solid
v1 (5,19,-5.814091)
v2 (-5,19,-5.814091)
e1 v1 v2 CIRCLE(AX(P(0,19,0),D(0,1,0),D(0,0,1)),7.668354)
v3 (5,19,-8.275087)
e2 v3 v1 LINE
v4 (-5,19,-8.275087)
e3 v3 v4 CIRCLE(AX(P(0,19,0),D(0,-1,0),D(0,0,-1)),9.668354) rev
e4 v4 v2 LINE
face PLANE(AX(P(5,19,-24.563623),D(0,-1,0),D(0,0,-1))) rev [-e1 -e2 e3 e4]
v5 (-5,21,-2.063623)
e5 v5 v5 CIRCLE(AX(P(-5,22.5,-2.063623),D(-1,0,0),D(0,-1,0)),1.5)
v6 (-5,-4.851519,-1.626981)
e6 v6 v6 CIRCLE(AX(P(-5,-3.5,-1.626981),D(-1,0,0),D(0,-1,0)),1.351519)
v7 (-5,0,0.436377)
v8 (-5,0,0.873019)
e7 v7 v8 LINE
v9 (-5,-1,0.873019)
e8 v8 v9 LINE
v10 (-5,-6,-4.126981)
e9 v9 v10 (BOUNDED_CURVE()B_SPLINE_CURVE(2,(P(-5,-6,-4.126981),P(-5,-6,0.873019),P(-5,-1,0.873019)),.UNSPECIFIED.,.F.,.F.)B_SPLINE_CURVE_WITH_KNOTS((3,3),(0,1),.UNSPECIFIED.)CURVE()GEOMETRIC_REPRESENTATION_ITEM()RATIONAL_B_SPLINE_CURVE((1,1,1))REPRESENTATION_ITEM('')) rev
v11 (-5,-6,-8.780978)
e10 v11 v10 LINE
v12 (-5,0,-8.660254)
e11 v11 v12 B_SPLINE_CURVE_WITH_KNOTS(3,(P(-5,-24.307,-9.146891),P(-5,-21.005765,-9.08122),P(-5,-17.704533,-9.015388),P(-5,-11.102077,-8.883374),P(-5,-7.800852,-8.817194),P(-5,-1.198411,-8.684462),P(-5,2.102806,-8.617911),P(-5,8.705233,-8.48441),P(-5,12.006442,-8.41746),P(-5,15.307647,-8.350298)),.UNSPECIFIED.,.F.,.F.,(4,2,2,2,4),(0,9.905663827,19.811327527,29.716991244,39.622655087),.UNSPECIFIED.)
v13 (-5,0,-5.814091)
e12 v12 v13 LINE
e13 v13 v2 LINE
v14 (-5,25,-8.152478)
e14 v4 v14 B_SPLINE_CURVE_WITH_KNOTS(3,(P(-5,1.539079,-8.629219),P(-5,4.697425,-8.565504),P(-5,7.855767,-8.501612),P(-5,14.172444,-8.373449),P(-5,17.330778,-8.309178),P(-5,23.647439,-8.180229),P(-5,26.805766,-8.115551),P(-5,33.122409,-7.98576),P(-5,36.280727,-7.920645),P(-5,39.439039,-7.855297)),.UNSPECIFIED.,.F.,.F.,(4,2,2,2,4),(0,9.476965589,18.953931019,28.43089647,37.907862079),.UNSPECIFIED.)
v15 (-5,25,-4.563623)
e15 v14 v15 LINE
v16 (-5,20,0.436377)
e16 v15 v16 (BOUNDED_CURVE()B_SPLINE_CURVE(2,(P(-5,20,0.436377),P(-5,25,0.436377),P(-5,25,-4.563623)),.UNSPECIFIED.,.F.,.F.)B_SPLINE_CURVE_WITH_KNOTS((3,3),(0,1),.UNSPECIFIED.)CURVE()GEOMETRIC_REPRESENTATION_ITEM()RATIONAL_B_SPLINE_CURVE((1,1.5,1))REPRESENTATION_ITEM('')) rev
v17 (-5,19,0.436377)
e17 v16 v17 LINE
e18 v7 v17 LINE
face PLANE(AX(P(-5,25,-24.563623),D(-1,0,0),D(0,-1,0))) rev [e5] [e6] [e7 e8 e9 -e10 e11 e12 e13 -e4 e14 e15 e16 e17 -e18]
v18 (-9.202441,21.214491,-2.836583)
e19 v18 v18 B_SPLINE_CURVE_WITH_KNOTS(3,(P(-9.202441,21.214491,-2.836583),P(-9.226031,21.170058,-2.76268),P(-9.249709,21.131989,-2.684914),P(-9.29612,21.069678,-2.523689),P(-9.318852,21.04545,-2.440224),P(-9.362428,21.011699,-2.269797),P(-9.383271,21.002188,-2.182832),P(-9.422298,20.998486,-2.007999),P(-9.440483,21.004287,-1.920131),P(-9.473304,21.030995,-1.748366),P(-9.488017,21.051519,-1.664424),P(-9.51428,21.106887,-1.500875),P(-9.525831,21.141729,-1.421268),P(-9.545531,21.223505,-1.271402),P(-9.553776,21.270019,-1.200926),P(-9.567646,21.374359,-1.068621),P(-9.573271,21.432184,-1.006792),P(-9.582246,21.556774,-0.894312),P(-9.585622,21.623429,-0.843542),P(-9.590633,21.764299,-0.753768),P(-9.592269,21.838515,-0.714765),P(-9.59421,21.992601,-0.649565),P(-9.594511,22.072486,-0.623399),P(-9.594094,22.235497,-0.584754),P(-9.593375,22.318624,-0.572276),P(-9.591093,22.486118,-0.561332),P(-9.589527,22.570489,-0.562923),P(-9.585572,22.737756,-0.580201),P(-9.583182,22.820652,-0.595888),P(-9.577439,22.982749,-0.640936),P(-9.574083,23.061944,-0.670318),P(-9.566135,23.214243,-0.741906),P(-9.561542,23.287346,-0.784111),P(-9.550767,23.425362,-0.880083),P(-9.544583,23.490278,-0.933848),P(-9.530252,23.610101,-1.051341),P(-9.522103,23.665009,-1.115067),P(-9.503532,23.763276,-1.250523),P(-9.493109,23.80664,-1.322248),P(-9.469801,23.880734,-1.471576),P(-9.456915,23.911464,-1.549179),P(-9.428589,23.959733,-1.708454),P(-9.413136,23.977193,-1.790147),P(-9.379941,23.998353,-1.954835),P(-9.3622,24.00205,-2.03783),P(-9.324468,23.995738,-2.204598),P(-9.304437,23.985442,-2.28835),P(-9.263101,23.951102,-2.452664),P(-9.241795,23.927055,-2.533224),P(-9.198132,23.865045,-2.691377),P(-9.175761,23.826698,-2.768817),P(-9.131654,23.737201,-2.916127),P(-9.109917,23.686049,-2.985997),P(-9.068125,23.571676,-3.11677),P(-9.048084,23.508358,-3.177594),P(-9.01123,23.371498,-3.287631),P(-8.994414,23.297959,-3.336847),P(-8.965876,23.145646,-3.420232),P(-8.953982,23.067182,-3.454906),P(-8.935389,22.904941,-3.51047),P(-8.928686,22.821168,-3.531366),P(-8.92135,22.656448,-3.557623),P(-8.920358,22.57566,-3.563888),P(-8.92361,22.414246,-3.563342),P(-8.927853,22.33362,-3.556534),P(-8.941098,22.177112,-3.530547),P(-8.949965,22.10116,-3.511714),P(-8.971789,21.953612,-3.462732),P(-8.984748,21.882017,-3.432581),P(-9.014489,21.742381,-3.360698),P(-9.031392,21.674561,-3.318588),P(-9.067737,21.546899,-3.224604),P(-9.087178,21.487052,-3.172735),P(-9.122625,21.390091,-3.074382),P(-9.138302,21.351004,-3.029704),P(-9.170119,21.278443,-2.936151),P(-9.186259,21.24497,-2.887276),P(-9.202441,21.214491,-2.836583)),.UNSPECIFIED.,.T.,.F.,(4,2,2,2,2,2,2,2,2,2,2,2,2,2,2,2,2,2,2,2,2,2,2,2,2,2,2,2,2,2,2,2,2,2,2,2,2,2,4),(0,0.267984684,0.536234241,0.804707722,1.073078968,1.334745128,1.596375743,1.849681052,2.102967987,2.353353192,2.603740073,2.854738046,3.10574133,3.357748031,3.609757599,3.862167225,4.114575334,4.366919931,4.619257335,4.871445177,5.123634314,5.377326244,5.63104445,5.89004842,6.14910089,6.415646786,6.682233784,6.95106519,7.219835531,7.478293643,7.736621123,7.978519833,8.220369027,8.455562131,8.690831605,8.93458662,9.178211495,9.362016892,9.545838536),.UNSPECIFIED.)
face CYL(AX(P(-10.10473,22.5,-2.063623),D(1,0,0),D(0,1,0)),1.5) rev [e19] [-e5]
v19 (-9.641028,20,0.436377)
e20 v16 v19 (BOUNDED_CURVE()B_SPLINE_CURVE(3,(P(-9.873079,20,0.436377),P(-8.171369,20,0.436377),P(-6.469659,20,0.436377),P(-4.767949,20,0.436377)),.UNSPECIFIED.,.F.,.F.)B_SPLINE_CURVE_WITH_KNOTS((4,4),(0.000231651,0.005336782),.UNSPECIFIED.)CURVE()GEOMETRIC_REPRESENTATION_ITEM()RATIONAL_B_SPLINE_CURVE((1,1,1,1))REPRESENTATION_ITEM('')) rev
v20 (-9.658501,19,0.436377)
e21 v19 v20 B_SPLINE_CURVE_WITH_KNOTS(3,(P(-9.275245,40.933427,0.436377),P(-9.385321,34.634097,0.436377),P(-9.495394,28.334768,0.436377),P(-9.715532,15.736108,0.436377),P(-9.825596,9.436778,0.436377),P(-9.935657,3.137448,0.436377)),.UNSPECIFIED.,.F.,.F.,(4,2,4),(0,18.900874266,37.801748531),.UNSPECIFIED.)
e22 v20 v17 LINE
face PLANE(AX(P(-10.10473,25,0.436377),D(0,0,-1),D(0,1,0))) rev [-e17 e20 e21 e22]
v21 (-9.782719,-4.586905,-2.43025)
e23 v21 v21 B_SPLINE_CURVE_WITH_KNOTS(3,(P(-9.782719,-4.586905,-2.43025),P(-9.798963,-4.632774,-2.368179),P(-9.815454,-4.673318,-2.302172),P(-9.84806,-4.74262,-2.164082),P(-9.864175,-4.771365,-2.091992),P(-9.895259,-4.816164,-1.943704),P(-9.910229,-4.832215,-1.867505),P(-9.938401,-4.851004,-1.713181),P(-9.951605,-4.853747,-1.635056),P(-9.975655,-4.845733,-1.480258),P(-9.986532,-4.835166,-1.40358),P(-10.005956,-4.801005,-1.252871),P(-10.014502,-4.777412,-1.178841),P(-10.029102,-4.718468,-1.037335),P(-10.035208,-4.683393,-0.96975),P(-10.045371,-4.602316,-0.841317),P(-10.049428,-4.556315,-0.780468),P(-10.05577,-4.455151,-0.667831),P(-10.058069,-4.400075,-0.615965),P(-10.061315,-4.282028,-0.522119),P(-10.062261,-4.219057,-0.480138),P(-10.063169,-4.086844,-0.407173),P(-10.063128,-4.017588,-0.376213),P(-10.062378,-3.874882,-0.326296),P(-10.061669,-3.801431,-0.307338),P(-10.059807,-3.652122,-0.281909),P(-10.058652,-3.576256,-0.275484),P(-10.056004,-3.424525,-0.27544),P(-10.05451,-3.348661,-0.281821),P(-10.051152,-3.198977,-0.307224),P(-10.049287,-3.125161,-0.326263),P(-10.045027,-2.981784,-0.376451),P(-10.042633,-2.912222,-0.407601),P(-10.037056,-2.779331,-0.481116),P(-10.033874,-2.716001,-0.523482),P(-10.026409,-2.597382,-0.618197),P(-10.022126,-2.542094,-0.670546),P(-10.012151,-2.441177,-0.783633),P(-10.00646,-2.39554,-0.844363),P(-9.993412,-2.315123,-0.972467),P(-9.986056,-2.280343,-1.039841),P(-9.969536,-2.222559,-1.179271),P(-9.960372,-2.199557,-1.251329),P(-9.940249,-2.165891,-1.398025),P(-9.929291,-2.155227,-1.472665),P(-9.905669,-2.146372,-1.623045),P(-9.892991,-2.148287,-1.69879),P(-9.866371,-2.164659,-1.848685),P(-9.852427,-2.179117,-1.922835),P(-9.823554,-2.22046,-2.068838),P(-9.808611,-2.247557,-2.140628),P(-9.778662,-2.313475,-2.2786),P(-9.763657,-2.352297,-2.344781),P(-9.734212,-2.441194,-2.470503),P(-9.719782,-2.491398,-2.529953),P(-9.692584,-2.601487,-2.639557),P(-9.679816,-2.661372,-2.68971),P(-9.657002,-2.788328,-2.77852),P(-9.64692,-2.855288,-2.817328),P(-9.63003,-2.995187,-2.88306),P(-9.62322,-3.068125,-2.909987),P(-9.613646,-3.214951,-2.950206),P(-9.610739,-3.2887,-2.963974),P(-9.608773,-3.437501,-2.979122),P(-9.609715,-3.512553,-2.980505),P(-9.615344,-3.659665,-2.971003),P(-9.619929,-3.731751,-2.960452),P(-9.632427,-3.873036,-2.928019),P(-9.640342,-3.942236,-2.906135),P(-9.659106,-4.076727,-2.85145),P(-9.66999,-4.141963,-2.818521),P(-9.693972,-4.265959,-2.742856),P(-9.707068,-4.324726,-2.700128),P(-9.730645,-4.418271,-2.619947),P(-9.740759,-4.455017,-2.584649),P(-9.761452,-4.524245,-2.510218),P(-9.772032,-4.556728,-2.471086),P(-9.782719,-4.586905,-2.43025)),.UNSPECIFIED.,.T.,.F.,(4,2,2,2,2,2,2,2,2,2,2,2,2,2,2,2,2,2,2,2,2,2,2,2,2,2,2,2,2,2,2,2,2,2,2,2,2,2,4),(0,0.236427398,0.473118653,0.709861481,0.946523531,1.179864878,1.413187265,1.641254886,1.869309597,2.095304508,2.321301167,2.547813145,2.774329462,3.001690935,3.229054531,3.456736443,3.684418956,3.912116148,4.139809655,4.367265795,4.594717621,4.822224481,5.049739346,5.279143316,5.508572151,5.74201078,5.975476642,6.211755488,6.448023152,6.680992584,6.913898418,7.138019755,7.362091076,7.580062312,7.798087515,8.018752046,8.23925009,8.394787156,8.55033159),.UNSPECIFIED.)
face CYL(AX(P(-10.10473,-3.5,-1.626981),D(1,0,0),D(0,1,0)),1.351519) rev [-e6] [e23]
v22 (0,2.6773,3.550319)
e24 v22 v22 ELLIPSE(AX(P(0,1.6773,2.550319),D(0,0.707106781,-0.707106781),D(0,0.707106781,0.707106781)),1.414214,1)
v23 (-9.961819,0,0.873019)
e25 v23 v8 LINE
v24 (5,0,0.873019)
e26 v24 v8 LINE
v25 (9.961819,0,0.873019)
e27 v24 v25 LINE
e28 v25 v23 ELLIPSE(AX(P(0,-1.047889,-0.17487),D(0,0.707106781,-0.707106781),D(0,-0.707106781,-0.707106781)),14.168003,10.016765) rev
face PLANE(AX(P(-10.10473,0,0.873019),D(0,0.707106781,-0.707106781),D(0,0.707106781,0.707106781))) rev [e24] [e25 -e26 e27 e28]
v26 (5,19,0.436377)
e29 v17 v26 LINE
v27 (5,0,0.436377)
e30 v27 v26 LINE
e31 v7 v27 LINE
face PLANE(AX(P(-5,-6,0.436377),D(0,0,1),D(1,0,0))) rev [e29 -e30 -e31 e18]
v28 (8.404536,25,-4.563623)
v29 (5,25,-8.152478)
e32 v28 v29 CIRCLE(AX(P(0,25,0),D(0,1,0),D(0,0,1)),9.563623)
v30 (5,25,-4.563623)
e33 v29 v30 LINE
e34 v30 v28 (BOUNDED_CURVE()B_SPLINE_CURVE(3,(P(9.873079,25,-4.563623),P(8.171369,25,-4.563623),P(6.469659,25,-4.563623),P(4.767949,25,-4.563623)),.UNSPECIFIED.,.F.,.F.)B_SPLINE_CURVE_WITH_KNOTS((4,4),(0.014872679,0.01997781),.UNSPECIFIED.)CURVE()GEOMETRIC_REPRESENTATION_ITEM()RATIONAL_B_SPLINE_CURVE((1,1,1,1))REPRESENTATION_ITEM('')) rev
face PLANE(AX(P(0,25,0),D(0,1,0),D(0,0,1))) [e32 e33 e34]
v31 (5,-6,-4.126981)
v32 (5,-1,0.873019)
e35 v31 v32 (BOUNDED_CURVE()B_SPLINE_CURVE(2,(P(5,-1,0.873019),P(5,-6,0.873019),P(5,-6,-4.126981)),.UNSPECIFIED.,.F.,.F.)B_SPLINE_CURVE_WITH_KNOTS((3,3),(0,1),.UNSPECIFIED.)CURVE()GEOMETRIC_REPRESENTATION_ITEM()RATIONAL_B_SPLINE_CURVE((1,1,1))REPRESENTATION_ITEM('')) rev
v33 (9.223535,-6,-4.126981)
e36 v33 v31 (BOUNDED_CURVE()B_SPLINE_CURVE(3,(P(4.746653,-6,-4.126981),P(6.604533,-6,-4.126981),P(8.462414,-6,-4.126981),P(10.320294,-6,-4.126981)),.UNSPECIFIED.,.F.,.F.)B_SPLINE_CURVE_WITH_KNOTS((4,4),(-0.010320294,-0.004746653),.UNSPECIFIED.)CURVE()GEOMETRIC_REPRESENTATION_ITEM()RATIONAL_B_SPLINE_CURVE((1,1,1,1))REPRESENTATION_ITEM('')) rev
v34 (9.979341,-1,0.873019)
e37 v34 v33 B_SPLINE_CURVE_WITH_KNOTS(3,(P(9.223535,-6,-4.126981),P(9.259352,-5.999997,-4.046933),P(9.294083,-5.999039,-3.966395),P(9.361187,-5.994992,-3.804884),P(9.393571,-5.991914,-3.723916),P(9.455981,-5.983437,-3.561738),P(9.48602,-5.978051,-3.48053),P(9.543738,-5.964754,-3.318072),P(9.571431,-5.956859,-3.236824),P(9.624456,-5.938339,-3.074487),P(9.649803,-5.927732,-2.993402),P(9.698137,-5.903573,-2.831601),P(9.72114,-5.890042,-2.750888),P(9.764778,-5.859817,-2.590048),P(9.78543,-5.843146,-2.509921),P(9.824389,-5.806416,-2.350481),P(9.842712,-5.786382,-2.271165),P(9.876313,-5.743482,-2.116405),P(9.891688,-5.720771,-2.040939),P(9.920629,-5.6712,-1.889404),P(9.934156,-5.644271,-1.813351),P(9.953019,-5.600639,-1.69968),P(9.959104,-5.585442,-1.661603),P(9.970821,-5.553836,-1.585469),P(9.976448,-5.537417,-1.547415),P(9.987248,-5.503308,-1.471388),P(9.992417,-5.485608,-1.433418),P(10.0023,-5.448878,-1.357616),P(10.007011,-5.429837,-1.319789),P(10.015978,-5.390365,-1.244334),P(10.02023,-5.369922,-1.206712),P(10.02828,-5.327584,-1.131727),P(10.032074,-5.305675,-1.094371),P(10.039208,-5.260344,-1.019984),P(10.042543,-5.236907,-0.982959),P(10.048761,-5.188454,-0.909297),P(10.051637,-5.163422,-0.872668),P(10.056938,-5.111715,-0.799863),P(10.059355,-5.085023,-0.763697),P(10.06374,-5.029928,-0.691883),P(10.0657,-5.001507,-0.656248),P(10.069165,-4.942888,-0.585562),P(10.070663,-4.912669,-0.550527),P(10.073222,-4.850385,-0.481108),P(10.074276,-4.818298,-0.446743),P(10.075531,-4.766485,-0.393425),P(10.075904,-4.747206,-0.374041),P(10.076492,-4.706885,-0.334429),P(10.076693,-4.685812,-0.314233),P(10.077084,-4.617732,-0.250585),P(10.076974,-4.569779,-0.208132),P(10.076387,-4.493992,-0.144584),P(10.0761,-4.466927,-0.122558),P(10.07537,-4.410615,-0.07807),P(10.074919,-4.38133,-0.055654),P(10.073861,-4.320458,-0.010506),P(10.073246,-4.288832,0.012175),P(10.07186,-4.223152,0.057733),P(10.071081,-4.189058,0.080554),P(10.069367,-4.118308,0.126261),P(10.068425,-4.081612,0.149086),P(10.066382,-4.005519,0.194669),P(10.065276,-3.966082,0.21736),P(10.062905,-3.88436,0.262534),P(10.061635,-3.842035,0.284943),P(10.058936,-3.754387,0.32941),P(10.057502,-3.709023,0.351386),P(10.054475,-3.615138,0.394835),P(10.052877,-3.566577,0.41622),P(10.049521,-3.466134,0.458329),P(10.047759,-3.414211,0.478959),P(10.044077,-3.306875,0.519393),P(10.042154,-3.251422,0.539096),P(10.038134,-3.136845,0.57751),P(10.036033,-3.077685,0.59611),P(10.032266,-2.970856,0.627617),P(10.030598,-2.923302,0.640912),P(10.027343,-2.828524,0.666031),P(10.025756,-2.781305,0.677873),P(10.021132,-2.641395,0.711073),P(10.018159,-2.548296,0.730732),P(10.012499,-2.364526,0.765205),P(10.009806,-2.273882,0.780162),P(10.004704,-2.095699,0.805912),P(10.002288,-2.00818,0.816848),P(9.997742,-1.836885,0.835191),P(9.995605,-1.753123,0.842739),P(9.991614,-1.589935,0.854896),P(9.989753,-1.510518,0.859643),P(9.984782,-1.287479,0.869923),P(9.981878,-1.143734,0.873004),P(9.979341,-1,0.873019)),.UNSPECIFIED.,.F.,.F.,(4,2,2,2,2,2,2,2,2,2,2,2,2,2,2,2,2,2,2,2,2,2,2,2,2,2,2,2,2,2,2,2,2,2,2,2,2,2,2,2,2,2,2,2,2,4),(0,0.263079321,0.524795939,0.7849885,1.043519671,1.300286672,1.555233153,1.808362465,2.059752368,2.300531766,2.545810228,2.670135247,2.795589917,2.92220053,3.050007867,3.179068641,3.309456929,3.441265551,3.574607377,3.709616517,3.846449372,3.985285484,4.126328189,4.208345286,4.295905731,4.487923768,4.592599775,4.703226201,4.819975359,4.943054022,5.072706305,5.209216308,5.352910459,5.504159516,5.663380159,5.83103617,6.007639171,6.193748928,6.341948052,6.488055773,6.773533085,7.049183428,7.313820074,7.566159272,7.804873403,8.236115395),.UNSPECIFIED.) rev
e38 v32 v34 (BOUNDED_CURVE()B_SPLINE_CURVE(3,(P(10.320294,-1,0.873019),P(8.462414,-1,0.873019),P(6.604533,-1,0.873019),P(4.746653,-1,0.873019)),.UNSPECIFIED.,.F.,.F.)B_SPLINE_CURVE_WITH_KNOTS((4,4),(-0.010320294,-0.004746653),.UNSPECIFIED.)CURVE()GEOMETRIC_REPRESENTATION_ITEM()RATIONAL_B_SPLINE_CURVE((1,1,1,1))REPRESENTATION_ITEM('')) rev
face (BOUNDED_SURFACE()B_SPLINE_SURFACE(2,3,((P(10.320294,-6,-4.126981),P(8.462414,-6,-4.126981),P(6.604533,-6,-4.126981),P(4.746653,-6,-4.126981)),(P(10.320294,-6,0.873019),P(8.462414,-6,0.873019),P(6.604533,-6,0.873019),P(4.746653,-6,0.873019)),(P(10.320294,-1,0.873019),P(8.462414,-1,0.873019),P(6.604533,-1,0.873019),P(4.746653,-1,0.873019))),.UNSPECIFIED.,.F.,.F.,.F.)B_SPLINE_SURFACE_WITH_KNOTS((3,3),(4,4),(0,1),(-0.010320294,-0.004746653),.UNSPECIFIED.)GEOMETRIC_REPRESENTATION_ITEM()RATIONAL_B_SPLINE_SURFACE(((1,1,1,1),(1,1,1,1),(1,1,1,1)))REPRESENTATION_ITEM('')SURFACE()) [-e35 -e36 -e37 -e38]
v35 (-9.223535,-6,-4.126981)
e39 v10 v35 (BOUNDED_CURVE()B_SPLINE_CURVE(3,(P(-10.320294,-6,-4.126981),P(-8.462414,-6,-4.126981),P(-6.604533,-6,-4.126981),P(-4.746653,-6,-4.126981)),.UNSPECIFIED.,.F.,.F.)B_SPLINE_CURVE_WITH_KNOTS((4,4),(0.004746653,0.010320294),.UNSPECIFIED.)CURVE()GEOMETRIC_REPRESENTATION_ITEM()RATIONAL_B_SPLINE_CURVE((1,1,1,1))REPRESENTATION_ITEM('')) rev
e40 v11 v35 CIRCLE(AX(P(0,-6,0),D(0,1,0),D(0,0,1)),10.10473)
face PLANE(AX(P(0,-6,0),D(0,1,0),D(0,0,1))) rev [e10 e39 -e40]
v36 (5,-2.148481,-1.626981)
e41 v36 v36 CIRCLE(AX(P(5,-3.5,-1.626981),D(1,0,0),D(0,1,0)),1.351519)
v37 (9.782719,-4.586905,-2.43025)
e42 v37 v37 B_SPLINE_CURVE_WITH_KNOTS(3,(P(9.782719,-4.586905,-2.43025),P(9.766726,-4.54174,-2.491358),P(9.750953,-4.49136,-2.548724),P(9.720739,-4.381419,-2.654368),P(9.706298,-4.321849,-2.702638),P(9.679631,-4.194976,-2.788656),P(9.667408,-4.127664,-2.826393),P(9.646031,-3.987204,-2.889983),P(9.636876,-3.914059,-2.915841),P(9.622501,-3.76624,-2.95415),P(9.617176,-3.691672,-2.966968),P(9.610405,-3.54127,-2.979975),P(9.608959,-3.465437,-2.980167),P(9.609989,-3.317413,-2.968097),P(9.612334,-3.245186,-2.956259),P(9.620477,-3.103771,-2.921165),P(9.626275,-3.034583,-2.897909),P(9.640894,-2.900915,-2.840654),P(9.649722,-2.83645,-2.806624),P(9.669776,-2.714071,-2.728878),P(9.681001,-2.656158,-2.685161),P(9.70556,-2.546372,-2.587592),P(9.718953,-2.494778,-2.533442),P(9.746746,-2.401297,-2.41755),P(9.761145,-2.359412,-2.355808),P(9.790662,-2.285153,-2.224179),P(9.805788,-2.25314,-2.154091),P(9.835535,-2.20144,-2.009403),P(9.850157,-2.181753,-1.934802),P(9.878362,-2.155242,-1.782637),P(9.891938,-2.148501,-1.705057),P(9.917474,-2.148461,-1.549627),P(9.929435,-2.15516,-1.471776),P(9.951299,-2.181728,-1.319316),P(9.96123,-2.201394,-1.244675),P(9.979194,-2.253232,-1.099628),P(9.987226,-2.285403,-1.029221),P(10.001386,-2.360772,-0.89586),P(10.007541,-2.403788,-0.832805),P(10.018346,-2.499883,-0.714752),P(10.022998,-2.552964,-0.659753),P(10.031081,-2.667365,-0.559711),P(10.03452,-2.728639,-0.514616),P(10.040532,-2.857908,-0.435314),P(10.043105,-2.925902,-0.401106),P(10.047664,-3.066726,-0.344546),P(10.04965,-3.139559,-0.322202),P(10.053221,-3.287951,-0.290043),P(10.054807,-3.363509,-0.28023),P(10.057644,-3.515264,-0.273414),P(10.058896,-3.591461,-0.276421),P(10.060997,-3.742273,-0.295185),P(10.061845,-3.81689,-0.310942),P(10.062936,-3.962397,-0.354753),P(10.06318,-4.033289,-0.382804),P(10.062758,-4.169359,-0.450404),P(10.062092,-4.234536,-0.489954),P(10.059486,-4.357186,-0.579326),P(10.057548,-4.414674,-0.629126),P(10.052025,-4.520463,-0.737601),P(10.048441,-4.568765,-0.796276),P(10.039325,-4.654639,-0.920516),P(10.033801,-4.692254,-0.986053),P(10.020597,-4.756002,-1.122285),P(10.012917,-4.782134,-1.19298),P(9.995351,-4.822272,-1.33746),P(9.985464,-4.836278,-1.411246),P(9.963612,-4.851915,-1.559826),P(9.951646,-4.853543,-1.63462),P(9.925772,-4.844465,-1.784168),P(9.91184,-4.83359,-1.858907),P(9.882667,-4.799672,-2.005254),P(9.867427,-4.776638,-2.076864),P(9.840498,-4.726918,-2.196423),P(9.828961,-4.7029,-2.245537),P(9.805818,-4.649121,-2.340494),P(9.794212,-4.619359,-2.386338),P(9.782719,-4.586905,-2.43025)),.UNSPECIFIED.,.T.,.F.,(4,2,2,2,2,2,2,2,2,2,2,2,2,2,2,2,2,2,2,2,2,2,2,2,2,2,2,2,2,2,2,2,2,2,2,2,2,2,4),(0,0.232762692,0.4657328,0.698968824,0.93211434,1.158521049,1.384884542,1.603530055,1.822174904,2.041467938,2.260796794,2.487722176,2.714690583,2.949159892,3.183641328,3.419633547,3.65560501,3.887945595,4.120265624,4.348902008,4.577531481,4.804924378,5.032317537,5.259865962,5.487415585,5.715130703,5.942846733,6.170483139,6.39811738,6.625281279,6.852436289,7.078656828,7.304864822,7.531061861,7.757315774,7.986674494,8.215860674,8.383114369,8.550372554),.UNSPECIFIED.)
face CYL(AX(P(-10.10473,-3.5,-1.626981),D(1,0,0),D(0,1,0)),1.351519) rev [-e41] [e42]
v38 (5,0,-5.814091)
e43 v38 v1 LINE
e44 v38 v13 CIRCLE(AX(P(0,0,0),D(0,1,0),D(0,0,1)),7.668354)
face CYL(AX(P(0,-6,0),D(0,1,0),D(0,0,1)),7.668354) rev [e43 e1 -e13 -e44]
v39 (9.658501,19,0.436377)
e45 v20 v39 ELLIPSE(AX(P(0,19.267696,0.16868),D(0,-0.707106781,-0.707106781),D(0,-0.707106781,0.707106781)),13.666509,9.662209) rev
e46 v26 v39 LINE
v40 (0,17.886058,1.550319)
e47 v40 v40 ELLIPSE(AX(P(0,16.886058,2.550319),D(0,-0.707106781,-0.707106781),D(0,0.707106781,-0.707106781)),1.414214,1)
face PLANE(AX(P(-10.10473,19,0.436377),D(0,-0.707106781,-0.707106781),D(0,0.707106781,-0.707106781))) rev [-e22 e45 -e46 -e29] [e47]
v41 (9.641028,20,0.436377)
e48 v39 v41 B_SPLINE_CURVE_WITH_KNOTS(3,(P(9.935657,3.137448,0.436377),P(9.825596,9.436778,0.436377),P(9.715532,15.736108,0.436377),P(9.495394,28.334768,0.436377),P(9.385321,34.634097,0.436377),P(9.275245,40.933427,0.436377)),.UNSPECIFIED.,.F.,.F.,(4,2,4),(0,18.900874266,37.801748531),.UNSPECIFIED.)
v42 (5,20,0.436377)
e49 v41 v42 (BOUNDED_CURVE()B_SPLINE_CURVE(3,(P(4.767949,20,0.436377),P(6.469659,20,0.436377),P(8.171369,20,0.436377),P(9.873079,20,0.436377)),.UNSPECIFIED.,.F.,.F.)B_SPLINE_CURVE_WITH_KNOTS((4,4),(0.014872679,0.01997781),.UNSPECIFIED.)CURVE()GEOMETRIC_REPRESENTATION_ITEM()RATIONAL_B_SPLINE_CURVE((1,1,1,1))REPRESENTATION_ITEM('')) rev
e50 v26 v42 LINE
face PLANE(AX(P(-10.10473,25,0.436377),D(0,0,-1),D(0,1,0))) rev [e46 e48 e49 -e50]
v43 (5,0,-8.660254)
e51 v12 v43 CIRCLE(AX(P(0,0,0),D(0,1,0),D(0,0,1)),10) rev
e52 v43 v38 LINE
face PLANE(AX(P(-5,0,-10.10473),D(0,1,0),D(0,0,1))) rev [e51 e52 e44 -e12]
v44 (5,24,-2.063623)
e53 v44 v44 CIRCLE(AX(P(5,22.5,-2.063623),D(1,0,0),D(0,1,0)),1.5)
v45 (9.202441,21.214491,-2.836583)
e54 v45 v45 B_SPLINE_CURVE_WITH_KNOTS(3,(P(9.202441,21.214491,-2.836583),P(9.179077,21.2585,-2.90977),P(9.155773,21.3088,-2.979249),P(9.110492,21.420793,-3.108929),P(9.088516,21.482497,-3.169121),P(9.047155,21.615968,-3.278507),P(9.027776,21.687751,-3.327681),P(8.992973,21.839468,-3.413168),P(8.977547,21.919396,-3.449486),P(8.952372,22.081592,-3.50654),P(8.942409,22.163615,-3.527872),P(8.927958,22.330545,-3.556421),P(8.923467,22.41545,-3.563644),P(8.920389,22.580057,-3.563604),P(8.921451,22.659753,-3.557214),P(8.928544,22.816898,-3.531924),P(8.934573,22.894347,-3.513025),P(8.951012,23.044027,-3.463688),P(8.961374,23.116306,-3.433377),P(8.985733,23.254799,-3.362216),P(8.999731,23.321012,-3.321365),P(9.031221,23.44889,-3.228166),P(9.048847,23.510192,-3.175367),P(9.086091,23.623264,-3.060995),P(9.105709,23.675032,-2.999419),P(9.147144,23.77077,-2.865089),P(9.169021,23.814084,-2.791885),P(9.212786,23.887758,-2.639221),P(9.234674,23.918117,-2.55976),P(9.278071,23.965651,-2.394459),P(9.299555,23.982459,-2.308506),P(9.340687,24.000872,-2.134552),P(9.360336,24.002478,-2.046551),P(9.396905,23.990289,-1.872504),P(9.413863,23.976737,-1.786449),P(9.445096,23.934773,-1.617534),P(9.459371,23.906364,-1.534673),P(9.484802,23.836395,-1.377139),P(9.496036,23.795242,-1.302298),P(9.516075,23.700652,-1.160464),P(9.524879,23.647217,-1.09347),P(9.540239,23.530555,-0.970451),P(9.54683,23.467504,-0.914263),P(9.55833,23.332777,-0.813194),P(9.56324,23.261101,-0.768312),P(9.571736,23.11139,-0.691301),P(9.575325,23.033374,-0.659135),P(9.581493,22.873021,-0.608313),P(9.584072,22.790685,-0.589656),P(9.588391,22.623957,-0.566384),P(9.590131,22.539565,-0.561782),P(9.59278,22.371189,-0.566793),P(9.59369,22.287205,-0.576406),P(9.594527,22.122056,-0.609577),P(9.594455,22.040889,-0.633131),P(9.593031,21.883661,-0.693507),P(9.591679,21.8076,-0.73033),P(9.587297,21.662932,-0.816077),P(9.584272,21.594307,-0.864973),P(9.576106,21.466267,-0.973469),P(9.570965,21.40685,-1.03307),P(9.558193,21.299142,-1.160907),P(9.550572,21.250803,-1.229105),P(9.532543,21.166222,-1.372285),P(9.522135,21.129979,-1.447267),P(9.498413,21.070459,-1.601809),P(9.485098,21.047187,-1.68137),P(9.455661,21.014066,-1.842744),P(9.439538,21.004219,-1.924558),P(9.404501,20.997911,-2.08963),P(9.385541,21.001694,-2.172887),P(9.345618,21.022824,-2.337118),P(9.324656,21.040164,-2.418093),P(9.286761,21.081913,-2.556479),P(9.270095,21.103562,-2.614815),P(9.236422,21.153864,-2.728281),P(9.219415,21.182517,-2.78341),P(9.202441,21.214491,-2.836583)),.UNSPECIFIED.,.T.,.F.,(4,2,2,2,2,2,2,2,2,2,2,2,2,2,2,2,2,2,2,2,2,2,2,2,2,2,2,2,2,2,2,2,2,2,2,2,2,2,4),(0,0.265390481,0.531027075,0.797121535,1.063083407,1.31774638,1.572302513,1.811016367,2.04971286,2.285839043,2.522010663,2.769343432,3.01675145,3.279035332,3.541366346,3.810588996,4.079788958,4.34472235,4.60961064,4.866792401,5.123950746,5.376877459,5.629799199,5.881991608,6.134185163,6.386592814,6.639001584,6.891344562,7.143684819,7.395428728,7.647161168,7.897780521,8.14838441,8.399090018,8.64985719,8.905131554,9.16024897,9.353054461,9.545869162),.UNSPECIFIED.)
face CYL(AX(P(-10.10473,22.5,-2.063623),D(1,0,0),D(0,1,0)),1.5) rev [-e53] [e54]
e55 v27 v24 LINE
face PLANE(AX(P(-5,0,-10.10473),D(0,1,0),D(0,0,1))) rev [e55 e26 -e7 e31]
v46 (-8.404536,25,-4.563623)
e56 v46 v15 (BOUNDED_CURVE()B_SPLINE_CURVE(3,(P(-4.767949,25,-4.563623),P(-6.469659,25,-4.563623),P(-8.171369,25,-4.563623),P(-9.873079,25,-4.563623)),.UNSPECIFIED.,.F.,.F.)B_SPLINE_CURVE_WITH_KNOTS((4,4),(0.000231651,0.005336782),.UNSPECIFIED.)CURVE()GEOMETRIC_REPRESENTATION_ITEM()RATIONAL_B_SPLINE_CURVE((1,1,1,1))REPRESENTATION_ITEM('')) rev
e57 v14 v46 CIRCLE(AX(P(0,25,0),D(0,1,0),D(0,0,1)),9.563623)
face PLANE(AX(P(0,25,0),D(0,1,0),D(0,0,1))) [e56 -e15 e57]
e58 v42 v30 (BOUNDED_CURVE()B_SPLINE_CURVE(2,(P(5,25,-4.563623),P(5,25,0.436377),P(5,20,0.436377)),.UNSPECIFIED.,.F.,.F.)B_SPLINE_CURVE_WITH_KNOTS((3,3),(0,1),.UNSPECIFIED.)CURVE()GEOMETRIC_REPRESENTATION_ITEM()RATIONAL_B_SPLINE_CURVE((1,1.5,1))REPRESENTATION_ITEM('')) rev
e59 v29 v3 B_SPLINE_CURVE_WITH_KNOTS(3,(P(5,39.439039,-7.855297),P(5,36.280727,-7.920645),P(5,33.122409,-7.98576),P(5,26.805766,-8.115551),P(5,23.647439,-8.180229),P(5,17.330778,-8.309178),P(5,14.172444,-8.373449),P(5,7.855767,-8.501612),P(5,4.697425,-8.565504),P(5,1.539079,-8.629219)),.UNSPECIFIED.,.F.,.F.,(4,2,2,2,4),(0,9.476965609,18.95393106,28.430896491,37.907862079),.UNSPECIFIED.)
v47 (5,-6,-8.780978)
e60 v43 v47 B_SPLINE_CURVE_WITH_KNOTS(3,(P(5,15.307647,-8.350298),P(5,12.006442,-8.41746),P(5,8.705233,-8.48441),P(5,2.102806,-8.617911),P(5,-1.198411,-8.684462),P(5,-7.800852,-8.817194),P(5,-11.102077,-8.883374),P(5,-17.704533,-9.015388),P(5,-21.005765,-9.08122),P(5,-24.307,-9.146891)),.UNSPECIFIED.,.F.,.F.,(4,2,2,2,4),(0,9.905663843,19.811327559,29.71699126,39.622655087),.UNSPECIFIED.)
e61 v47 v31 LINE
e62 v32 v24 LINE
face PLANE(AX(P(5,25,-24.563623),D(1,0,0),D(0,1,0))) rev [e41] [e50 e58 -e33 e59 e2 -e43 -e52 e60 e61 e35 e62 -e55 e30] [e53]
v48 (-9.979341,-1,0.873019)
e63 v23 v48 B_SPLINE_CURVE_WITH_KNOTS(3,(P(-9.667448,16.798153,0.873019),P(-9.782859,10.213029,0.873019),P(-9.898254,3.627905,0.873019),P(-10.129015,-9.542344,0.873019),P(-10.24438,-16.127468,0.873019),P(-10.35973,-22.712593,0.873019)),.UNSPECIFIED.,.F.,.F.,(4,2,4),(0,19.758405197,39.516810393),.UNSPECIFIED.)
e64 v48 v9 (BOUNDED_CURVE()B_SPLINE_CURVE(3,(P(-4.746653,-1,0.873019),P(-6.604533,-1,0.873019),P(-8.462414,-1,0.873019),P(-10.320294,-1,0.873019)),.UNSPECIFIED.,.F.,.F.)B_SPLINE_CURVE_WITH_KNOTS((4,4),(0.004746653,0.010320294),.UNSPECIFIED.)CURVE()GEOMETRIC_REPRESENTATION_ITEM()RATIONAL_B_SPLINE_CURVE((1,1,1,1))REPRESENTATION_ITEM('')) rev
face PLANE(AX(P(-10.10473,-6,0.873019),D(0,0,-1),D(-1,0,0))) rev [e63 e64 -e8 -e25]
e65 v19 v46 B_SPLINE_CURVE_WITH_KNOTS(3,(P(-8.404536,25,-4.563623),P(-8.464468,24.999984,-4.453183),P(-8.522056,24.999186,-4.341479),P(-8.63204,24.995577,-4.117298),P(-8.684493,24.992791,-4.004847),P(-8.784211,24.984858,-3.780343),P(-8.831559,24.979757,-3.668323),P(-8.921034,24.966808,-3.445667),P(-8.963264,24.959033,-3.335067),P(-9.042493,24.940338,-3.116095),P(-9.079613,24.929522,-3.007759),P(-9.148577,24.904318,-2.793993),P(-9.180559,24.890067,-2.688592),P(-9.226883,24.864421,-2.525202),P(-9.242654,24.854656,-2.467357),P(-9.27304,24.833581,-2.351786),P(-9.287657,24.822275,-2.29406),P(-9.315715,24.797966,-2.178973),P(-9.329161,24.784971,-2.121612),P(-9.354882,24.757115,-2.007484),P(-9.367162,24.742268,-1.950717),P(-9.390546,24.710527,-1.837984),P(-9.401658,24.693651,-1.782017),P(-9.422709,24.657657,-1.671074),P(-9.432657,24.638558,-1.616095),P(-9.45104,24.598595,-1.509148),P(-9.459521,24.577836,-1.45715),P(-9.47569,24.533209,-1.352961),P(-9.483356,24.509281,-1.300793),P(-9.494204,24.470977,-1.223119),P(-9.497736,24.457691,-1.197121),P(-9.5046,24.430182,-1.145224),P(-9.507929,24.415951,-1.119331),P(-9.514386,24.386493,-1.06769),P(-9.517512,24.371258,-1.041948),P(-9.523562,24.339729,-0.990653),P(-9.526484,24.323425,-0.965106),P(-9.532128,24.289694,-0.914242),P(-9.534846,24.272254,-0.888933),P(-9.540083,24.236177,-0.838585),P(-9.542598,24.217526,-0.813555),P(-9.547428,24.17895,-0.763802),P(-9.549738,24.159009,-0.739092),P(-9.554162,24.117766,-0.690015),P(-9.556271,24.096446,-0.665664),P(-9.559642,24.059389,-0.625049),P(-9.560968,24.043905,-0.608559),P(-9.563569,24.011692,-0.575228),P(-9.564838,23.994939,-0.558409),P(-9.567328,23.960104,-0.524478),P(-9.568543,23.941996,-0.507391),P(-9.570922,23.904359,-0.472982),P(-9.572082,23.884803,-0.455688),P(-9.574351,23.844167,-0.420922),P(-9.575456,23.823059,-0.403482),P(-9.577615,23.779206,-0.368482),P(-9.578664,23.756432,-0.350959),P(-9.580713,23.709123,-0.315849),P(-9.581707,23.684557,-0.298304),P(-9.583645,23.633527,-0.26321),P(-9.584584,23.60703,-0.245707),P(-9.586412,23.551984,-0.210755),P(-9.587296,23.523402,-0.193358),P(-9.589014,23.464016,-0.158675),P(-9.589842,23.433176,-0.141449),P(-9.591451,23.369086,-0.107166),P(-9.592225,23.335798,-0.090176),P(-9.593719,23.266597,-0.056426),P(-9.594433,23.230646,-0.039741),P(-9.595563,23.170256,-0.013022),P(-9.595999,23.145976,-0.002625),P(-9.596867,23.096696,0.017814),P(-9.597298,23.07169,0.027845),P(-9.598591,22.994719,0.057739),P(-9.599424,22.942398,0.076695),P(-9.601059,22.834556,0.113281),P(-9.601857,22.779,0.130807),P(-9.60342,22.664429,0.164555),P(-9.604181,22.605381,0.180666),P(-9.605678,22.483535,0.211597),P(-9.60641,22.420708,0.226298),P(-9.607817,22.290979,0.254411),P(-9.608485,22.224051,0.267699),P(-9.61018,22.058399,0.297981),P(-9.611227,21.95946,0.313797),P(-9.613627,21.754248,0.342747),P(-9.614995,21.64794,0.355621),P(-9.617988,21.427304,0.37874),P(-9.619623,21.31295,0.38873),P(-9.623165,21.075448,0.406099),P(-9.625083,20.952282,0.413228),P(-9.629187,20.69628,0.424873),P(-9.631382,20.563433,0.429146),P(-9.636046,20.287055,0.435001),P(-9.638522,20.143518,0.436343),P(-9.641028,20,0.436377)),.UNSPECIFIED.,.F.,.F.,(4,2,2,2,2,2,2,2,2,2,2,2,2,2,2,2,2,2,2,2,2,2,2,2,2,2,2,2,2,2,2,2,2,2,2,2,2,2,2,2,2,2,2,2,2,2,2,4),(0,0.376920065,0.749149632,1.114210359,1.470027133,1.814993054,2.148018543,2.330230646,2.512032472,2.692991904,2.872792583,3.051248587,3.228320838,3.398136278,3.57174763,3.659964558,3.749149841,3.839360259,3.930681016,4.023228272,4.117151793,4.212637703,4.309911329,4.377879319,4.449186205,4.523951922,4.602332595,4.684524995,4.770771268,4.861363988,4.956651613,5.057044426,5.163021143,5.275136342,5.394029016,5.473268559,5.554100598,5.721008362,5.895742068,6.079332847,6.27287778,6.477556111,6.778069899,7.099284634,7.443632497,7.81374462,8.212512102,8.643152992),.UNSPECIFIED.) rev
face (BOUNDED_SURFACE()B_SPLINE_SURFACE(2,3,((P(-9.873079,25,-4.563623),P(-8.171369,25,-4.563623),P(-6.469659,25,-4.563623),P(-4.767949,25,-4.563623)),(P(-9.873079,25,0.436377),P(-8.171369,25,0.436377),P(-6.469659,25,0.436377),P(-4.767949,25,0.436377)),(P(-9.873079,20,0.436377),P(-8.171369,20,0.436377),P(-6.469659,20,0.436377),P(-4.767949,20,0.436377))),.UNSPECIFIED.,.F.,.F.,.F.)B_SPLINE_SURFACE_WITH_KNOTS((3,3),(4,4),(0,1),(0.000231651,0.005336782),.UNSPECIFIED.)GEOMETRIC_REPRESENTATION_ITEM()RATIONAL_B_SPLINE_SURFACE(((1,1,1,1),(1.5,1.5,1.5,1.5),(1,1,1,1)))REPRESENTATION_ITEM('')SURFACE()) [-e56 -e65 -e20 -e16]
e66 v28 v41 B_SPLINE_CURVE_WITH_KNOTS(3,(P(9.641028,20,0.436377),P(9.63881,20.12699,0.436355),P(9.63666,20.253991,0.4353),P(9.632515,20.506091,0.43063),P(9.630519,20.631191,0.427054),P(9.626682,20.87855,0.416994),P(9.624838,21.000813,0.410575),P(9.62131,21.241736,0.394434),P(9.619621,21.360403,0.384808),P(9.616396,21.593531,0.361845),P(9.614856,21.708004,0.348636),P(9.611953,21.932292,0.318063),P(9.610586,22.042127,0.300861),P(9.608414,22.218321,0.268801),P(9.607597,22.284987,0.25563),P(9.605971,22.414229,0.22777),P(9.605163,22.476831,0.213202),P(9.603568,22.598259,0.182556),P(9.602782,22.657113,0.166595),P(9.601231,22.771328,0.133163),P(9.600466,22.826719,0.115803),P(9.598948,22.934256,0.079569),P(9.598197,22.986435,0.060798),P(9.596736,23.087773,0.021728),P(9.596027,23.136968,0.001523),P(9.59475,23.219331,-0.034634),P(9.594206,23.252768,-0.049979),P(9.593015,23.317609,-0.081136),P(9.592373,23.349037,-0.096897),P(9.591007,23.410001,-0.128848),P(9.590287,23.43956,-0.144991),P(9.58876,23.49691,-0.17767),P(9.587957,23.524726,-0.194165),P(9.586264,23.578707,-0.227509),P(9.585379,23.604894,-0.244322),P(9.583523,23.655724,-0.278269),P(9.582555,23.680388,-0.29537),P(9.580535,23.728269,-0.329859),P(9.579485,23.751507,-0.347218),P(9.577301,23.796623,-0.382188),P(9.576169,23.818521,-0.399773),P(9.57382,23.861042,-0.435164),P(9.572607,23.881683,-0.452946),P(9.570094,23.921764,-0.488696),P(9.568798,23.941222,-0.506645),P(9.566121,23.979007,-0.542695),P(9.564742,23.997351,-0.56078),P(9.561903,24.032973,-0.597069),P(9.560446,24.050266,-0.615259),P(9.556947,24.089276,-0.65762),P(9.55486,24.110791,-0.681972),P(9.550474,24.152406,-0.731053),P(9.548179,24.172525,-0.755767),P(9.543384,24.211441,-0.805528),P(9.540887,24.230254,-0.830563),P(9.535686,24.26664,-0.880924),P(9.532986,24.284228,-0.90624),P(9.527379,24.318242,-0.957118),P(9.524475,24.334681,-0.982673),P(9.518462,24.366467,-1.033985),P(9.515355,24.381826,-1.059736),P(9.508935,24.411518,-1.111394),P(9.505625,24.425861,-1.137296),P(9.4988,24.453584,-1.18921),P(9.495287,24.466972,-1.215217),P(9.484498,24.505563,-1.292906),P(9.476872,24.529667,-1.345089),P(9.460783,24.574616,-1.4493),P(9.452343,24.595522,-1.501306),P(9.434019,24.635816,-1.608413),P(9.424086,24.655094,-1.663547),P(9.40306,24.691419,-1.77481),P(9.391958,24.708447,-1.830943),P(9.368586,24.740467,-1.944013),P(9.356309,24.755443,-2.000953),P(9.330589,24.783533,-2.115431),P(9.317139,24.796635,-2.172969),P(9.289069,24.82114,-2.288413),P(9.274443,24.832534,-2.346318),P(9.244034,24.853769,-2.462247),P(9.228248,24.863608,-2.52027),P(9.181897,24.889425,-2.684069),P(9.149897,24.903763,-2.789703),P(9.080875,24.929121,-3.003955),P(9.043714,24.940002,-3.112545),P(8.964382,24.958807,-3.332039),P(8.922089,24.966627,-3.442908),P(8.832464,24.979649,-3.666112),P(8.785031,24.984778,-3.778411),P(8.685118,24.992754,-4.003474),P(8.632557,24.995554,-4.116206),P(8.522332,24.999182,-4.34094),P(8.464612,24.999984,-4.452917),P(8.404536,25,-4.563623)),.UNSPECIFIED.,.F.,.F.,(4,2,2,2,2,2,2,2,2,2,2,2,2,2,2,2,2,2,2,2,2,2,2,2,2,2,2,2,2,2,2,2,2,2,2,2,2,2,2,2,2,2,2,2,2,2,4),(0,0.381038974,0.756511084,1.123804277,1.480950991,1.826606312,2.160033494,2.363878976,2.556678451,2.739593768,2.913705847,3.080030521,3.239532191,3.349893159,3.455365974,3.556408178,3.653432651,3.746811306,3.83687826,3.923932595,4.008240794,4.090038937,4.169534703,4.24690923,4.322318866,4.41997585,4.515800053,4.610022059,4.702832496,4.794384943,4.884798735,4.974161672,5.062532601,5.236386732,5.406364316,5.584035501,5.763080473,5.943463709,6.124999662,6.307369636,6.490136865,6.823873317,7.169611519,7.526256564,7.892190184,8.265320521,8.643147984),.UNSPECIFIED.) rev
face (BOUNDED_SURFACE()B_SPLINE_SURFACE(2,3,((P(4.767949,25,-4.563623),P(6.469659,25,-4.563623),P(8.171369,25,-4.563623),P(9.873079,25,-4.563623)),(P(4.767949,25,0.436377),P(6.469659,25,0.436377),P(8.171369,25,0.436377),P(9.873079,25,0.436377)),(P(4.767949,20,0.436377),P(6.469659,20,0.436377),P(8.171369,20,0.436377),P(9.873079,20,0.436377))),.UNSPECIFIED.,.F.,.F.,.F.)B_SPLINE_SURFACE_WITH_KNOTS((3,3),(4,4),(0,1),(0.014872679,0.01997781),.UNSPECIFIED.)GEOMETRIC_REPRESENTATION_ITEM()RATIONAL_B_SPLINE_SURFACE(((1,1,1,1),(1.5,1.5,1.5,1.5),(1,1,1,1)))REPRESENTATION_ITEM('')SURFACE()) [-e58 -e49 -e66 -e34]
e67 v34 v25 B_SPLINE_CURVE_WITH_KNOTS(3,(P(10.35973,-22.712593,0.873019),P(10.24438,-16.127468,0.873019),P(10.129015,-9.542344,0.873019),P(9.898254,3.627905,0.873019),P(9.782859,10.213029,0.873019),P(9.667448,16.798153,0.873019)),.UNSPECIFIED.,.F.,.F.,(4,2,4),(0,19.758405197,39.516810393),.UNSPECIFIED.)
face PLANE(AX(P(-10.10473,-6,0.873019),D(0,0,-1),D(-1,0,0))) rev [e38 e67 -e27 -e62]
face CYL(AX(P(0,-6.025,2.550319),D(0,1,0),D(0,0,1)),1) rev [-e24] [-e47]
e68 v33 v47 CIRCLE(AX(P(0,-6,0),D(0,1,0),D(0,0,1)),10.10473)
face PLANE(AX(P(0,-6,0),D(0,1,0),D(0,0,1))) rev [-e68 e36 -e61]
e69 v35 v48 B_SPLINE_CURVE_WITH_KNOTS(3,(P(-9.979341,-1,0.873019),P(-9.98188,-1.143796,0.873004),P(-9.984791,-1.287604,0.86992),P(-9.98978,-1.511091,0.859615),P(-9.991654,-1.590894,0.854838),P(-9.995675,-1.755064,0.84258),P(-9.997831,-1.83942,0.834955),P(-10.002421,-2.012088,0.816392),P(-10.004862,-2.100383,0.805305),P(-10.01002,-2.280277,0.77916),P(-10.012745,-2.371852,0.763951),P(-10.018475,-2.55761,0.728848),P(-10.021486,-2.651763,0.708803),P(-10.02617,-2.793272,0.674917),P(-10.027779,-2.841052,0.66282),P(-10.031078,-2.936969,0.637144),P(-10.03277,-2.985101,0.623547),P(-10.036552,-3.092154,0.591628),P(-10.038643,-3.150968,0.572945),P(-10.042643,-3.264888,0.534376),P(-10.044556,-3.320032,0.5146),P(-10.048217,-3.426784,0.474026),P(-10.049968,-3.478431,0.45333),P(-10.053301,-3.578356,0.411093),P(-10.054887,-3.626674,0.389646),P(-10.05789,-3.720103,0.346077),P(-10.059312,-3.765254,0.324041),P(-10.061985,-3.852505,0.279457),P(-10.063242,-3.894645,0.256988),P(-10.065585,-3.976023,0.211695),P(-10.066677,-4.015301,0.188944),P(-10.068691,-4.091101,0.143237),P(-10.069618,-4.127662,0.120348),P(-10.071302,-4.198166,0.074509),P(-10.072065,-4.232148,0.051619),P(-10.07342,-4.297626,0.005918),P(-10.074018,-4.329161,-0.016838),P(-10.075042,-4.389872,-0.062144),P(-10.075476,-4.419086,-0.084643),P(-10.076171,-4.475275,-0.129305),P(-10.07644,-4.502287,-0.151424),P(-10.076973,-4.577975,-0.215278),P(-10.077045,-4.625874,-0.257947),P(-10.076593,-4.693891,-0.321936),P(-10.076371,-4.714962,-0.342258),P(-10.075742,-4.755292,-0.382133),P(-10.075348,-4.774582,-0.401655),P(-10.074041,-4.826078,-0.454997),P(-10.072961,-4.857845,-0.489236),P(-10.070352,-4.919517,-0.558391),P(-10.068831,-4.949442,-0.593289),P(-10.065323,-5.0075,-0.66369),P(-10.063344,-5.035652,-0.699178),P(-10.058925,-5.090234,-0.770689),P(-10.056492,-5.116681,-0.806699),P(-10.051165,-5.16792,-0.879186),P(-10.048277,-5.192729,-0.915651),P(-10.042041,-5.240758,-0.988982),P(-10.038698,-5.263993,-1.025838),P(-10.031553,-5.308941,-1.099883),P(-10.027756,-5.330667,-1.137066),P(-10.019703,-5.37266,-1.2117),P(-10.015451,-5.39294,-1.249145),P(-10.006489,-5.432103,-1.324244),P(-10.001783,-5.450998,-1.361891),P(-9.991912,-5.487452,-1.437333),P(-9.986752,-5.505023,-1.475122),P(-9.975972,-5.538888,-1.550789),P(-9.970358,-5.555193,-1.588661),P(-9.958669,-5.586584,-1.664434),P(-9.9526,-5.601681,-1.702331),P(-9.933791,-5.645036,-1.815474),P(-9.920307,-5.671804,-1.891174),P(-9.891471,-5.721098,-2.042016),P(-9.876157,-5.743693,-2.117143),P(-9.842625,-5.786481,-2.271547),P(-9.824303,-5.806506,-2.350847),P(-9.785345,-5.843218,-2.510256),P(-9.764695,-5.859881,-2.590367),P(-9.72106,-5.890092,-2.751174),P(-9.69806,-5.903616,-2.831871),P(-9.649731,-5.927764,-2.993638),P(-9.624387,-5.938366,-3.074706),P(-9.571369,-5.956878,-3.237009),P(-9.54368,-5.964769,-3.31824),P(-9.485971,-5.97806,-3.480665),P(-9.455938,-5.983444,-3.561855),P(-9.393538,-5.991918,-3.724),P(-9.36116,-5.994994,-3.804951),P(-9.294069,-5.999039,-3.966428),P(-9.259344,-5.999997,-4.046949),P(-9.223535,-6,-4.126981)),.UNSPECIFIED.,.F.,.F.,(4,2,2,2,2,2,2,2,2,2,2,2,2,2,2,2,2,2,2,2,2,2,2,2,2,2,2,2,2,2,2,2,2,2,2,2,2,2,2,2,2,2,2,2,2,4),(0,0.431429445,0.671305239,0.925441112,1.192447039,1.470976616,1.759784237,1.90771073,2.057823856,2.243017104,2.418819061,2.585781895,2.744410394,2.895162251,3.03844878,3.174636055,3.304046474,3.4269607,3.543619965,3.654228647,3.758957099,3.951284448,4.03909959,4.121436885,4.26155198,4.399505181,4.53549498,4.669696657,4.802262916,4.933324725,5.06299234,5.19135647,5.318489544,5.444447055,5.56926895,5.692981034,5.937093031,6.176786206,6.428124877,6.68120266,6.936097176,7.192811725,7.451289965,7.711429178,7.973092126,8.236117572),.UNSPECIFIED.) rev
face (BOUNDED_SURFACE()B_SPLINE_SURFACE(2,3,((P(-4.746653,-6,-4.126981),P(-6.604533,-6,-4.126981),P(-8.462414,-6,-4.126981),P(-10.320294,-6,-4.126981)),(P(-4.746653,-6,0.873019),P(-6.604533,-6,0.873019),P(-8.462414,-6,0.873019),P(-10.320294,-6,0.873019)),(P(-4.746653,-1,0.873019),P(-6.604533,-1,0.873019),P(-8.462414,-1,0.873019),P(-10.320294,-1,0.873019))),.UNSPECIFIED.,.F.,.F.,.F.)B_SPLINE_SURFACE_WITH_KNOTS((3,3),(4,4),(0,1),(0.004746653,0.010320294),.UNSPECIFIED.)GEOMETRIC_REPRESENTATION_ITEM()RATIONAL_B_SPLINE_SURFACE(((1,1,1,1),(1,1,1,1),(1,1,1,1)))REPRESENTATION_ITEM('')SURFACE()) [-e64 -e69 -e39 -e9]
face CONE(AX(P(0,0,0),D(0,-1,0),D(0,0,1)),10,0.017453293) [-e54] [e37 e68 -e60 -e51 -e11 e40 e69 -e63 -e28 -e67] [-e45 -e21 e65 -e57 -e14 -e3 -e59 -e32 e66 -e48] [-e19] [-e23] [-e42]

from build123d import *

# Parameters (mm, degrees)
SKETCH1_R                     = 10
BOSS_EXTRUDE1_DEPTH           = 25
BOSS_EXTRUDE1_TAPER           = 1
BOSS_EXTRUDE1_OTHER_WAY_DEPTH = 6
BOSS_EXTRUDE1_OTHER_WAY_TAPER = -1
CUT_EXTRUDE1_DEPTH            = 29.796026679
CUT_EXTRUDE1_DEPTH_BACK       = 29.796026679
SKETCH3_W                     = 10
SKETCH3_H                     = 6
CUT_EXTRUDE2_DEPTH            = 25
CUT_EXTRUDE3_DEPTH            = 31.907255886
CUT_EXTRUDE3_DEPTH_BACK       = 31.907255886
SKETCH4_R                     = 1.5
FILLET2_SIZE                  = 5
CUT_EXTRUDE5_DEPTH            = 29.796026836
CUT_EXTRUDE5_DEPTH_BACK       = 29.796026836
SKETCH8_W                     = 10
SKETCH8_H                     = 6
CUT_EXTRUDE6_DEPTH            = 30.113855333
CUT_EXTRUDE7_DEPTH            = 29.75944341
CUT_EXTRUDE8_DEPTH            = 31.873174281
CUT_EXTRUDE8_DEPTH_BACK       = 31.873174281
SKETCH9_R                     = 1.351518808
FILLET3_SIZE                  = 5
SKETCH10_R                    = 1
CUT_EXTRUDE9_DEPTH            = 29.749923286


with BuildPart() as part:
    # Sketch1 → Boss-Extrude1 (new body)
    with BuildSketch(Plane(origin=(0, 0, 0), x_dir=(1, 0, 0), z_dir=(0, 1, 0))):
        Circle(SKETCH1_R)
    extrude(amount=BOSS_EXTRUDE1_DEPTH, taper=BOSS_EXTRUDE1_TAPER)

    # Sketch1 → Boss-Extrude1 other way (add)
    with BuildSketch(Plane(origin=(0, 0, 0), x_dir=(1, 0, 0), z_dir=(0, 1, 0))):
        Circle(SKETCH1_R)
    extrude(amount=-BOSS_EXTRUDE1_OTHER_WAY_DEPTH, taper=BOSS_EXTRUDE1_OTHER_WAY_TAPER)

    # Sketch2 → Cut-Extrude1 (cut, two sides: drawn at the far end of the back side and taken through both)
    with BuildSketch(Plane(origin=(0, 0, 0), x_dir=(0, 0, -1), z_dir=(1, 0, 0)).offset(-CUT_EXTRUDE1_DEPTH_BACK)):
        Polygon((-0.436376623, 25), (-0.436376623, 19), (-12.679815256, 6.756561367), (-12.679815256, 25), align=None)
    extrude(amount=CUT_EXTRUDE1_DEPTH + CUT_EXTRUDE1_DEPTH_BACK, mode=Mode.SUBTRACT)

    # Sketch3 → Cut-Extrude2 (cut)
    with BuildSketch(Plane.XY.offset(0.436376623)):
        with Locations((0, 22)):
            Rectangle(SKETCH3_W, SKETCH3_H)
    extrude(amount=-CUT_EXTRUDE2_DEPTH, mode=Mode.SUBTRACT)

    # Sketch4 → Cut-Extrude3 (cut, two sides: drawn at the far end of the back side and taken through both)
    with BuildSketch(Plane(origin=(-5, 0, 0), x_dir=(0, 0, -1), z_dir=(1, 0, 0)).offset(-CUT_EXTRUDE3_DEPTH_BACK)):
        with Locations(Location((2.063623377, 22.5, 0), (0, 0, 90))):
            Circle(SKETCH4_R)
    extrude(amount=CUT_EXTRUDE3_DEPTH + CUT_EXTRUDE3_DEPTH_BACK, mode=Mode.SUBTRACT)

    # Fillet2
    # a fillet whose section is not a circle: 5 mm, written as the material it takes off along each edge
    with BuildSketch(Plane(origin=(-7.5, 25, 0.436376623), x_dir=(0, -1, 0), z_dir=(1, 0, 0))) as fillet2_piece_1:
        with BuildLine():
            Bezier((FILLET2_SIZE, 0), (0, 0), (0, FILLET2_SIZE), weights=[1, 1.5, 1])
            Line((0, FILLET2_SIZE), (0, 0))
            Line((0, 0), (FILLET2_SIZE, 0))
        make_face()
    extrude(amount=29.553662519, mode=Mode.SUBTRACT)
    with BuildSketch(Plane(origin=(-22.053662519, 25, 0.436376623), x_dir=(0, 0, -1), z_dir=(1, 0, 0))) as fillet2_piece_2:
        with BuildLine():
            Bezier((FILLET2_SIZE, 0), (0, 0), (0, -FILLET2_SIZE), weights=[1, 1.5, 1])
            Line((0, -FILLET2_SIZE), (0, 0))
            Line((0, 0), (FILLET2_SIZE, 0))
        make_face()
    extrude(amount=29.553662519, mode=Mode.SUBTRACT)

    # Sketch7 → Cut-Extrude5 (cut, two sides: drawn at the far end of the back side and taken through both)
    with BuildSketch(Plane(origin=(0, 0, 0), x_dir=(0, 0, -1), z_dir=(1, 0, 0)).offset(-CUT_EXTRUDE5_DEPTH_BACK)):
        Polygon((-0.873019237, -6), (-0.873019237, 0), (-11.31781305, 10.444793812), (-11.31781305, -6), align=None)
    extrude(amount=CUT_EXTRUDE5_DEPTH + CUT_EXTRUDE5_DEPTH_BACK, mode=Mode.SUBTRACT)

    # Sketch8 → Cut-Extrude6 (cut, through all)
    with BuildSketch(Plane.XY.offset(0.873019237)):
        with Locations((0, -3)):
            Rectangle(SKETCH8_W, SKETCH8_H)
    extrude(amount=-CUT_EXTRUDE6_DEPTH, mode=Mode.SUBTRACT)

    # Sketch6 → Cut-Extrude7 (cut, through all)
    with BuildSketch(Plane(origin=(0, 19, 0), x_dir=(1, 0, 0), z_dir=(0, 1, 0))):
        with BuildLine():
            Line((5, 5.814090598), (5, -0.436376623))
            Line((5, -0.436376623), (-5, -0.436376623))
            Line((-5, -0.436376623), (-5, 5.814090598))
            ThreePointArc((-5, 5.814090598), (0, 7.668353766), (5, 5.814090598))
        make_face()
    extrude(amount=-CUT_EXTRUDE7_DEPTH, mode=Mode.SUBTRACT)

    # Sketch9 → Cut-Extrude8 (cut, two sides: drawn at the far end of the back side and taken through both)
    with BuildSketch(Plane(origin=(-5, 0, 0), x_dir=(0, 0, -1), z_dir=(1, 0, 0)).offset(-CUT_EXTRUDE8_DEPTH_BACK)):
        with Locations(Location((1.626980763, -3.5, 0), (0, 0, 90))):
            Circle(SKETCH9_R)
    extrude(amount=CUT_EXTRUDE8_DEPTH + CUT_EXTRUDE8_DEPTH_BACK, mode=Mode.SUBTRACT)

    # Fillet3
    # a fillet whose section is not a circle: 5 mm, written as the material it takes off along each edge
    with BuildSketch(Plane(origin=(22.566946591, -6, 0.873019237), x_dir=(0, 0, -1), z_dir=(-1, 0, 0))) as fillet3_piece_1:
        with BuildLine():
            Bezier((FILLET3_SIZE, 0), (0, 0), (0, -FILLET3_SIZE), weights=[1, 1, 1])
            Line((0, -FILLET3_SIZE), (0, 0))
            Line((0, 0), (FILLET3_SIZE, 0))
        make_face()
    extrude(amount=30.066946591, mode=Mode.SUBTRACT)
    with BuildSketch(Plane(origin=(7.5, -6, 0.873019237), x_dir=(0, 1, 0), z_dir=(-1, 0, 0))) as fillet3_piece_2:
        with BuildLine():
            Bezier((FILLET3_SIZE, 0), (0, 0), (0, FILLET3_SIZE), weights=[1, 1, 1])
            Line((0, FILLET3_SIZE), (0, 0))
            Line((0, 0), (FILLET3_SIZE, 0))
        make_face()
    extrude(amount=30.066946591, mode=Mode.SUBTRACT)

    # Sketch10 → Cut-Extrude9 (cut, through all)
    with BuildSketch(Plane(origin=(0, 19, 0), x_dir=(1, 0, 0), z_dir=(0, 1, 0))):
        with Locations(Location((0, -2.550318856, 0), (0, 0, 270))):
            Circle(SKETCH10_R)
    extrude(amount=-CUT_EXTRUDE9_DEPTH, mode=Mode.SUBTRACT)


solid = part.part
